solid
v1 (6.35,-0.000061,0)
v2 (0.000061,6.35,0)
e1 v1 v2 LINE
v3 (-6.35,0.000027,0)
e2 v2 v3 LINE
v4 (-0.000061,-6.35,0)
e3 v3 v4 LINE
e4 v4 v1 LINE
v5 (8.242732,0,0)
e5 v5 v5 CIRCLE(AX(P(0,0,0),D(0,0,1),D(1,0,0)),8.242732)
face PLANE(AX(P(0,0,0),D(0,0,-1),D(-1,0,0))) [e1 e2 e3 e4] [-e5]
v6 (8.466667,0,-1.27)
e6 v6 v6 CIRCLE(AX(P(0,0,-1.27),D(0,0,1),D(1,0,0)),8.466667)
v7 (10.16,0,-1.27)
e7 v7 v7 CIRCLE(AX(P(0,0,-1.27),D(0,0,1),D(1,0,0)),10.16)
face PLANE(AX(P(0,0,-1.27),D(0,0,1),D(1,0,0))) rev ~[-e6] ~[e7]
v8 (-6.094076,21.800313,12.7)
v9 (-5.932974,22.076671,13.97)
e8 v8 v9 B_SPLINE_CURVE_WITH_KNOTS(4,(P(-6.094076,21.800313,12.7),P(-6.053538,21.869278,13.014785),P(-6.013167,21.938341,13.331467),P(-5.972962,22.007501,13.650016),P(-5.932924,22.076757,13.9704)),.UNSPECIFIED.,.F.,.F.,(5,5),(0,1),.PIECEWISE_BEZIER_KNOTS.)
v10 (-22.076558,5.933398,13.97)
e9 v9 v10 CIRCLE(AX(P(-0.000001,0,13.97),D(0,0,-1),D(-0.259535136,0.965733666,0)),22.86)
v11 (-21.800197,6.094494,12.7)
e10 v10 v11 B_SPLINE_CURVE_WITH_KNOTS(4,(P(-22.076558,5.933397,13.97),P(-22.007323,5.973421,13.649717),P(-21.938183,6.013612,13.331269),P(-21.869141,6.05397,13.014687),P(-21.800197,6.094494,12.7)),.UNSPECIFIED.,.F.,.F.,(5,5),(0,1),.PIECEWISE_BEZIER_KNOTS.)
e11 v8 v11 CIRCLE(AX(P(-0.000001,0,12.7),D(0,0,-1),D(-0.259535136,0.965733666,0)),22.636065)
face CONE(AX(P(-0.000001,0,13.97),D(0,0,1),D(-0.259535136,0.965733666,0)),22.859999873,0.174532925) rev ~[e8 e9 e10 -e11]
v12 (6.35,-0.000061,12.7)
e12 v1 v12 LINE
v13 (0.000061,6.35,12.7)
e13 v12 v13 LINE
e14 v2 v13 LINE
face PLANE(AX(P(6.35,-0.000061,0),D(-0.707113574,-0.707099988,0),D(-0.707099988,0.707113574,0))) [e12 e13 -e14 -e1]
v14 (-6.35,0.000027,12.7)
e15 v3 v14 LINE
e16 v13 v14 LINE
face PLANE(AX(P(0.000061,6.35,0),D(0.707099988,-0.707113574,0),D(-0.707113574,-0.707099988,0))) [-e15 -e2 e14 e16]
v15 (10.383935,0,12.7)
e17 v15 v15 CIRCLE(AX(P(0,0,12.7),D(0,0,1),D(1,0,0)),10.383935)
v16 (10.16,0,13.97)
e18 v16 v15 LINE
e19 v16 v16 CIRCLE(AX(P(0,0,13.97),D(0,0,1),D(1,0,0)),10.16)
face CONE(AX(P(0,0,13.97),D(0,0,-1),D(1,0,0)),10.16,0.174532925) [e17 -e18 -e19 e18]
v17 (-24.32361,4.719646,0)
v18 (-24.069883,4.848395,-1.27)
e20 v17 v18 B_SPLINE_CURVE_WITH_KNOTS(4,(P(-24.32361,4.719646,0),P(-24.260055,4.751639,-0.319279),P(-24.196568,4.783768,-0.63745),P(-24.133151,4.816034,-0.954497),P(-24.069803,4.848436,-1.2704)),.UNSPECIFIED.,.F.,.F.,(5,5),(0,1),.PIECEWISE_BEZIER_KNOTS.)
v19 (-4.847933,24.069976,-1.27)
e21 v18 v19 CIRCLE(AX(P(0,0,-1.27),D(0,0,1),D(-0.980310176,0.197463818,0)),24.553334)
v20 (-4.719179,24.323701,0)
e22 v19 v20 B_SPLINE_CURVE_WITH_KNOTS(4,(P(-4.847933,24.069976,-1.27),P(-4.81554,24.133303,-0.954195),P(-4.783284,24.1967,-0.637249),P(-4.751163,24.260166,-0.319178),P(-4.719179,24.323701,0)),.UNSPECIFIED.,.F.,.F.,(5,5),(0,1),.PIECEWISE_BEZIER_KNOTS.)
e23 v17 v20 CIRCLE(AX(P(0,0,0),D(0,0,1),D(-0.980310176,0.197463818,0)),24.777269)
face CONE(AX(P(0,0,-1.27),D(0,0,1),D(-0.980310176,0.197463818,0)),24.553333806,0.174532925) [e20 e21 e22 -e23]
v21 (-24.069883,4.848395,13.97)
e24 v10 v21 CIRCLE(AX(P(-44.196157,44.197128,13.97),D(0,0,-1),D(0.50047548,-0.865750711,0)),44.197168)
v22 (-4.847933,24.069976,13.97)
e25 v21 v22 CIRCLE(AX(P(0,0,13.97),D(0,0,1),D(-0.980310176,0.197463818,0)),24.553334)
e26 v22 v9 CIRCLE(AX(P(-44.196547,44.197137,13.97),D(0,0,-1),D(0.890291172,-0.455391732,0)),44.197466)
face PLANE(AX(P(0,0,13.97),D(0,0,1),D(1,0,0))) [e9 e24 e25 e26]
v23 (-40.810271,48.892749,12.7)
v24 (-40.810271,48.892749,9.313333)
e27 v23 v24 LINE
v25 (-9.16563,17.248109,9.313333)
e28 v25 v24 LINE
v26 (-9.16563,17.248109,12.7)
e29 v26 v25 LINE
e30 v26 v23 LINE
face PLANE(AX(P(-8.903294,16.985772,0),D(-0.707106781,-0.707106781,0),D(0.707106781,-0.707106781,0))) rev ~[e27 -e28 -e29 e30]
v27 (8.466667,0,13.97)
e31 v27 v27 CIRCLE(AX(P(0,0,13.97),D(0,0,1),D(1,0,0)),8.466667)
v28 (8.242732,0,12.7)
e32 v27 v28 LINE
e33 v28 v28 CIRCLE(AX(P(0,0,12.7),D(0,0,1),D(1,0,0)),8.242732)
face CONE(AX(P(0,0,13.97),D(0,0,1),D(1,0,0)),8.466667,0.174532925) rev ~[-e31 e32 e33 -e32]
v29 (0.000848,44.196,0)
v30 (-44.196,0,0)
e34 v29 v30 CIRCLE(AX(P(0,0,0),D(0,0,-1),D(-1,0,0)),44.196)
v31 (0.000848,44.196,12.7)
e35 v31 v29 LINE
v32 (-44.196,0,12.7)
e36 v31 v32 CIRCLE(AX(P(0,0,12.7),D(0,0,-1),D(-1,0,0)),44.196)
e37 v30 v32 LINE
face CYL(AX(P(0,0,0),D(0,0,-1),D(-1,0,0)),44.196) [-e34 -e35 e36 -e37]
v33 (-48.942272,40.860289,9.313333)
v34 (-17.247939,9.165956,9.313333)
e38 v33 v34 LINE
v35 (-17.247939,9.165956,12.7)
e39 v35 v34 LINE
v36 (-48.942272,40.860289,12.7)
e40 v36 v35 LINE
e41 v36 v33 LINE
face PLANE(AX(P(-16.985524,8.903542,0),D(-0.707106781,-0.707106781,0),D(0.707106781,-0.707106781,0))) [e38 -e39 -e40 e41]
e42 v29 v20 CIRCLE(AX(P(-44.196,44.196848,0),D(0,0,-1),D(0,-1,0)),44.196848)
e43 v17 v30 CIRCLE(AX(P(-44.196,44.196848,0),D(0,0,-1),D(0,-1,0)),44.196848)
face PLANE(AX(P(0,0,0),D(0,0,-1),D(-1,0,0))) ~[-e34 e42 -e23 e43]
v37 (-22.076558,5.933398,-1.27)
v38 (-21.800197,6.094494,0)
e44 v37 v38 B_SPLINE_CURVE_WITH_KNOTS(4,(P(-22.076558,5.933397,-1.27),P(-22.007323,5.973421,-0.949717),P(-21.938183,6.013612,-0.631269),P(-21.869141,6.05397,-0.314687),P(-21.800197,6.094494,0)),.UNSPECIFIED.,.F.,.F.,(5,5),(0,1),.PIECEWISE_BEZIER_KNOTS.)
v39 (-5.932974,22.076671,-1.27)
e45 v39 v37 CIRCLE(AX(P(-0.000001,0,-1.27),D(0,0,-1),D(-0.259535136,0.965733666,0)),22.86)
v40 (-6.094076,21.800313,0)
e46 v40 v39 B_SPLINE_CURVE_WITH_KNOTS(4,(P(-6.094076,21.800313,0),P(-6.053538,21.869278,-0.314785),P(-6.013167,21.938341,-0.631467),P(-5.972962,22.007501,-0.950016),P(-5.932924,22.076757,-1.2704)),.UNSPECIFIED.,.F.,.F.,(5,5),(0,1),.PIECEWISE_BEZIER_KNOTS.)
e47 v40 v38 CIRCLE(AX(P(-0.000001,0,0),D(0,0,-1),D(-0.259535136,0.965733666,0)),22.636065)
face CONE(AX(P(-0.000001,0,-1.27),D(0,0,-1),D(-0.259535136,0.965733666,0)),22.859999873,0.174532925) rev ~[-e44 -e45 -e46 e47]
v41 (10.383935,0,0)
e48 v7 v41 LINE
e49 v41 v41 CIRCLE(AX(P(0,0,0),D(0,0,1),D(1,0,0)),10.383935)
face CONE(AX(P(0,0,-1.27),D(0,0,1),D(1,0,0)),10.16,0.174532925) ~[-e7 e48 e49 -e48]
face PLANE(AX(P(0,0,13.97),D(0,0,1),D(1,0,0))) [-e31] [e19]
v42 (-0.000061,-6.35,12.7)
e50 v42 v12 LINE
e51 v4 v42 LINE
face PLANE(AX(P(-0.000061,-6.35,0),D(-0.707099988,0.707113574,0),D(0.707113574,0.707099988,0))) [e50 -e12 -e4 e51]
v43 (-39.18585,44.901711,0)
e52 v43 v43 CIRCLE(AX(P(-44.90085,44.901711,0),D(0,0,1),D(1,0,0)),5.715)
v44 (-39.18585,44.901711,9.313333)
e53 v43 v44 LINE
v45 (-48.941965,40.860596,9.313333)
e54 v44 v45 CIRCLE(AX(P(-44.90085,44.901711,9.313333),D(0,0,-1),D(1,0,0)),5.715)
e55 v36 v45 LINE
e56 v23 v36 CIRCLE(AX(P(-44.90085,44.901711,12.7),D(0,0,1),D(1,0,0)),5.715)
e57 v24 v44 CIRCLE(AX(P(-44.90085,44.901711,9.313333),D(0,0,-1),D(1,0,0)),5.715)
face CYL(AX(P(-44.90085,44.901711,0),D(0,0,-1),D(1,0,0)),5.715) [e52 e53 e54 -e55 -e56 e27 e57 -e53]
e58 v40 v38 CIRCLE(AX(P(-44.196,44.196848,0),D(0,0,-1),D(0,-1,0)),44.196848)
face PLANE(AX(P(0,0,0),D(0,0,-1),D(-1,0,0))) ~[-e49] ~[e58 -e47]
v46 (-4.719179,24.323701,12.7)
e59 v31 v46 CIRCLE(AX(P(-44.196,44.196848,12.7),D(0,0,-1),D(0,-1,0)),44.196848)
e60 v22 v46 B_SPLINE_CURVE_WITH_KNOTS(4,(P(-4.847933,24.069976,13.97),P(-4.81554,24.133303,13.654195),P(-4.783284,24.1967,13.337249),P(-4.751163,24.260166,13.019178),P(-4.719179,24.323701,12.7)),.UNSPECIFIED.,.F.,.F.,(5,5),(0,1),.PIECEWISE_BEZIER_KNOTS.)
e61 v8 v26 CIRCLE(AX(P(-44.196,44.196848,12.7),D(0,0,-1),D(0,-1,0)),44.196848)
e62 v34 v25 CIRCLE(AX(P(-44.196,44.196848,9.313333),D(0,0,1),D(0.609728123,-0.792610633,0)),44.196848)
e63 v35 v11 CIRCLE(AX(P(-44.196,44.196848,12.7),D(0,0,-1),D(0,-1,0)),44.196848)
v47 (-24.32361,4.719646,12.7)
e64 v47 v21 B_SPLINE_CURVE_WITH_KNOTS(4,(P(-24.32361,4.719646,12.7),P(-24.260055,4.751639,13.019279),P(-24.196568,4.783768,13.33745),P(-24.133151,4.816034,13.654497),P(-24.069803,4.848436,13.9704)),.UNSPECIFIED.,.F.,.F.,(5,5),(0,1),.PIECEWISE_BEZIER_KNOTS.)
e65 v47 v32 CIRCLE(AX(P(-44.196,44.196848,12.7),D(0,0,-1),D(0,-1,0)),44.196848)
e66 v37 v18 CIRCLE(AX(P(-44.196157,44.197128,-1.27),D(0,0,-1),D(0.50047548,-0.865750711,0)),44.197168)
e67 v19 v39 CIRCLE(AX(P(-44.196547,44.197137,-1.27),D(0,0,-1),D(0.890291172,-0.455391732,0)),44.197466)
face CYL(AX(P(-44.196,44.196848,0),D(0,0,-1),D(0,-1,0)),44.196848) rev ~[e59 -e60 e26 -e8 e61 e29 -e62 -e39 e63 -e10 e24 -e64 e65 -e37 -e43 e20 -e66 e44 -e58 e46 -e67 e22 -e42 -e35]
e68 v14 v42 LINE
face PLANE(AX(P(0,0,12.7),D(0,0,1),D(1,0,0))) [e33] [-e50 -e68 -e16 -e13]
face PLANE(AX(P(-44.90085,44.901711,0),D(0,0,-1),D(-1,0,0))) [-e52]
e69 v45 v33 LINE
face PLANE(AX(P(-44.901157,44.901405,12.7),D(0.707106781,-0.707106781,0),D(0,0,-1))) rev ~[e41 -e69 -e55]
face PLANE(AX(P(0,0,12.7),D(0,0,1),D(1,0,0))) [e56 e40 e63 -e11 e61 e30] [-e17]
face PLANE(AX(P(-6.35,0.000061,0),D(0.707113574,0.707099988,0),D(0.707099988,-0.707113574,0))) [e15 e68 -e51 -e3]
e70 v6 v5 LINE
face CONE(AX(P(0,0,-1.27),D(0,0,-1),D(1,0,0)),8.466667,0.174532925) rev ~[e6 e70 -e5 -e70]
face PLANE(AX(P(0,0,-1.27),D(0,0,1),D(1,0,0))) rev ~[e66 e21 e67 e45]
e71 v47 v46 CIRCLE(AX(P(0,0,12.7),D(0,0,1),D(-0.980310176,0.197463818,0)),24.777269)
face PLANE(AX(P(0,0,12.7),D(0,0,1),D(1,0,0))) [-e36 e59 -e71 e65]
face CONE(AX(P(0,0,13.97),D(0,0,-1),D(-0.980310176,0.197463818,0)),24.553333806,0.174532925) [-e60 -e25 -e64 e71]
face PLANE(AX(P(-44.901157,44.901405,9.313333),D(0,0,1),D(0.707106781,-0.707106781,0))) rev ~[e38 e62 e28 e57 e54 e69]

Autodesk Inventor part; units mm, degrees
ref_plane "YZ Plane" through (0, 0, 0) normal (1, 0, 0) x (0, 1, 0)
ref_plane "XZ Plane" through (0, 0, 0) normal (0, 1, 0) x (-1, 0, 0)
ref_plane "XY Plane" through (0, 0, 0) normal (0, 0, 1) x (1, 0, 0)
sketch "Sketch1" plane through (0, 0, 0) normal (0, 0, 1) x (1, 0, 0)
  line L0 (0, 0) -> (-89.8017, 0) construction
  line L1 (-89.8017, 0) -> (-44.90085, 44.901711) construction
  line L2 (-44.90085, 44.901711) -> (0, 0) construction
  arc A0 (-44.196, 0) -> (0.000848, 44.196) centre (0, 0) ccw
  line L3 (-44.196, 0) -> (-44.196, 44.196848) construction
  line L4 (-44.196, 44.196848) -> (-44.90085, 44.901711) construction
  circle A1 centre (-44.90085, 44.901711) radius 5.715
  arc A2 (-44.196, 0) -> (0.000848, 44.196) centre (-44.196, 44.196848) ccw
  dimension "d8" = 89.8017
  dimension "d9" = 63.5
  dimension "d10" = 63.5
  dimension "d11" = 44.196
  dimension "d12" = 11.43
extrude "Extrusion1" add sketch "Sketch1" along normal blind 13.97 and the other way blind 1.27
sketch "Sketch5" plane through (0, 0, 13.97) normal (0, 0, 1) x (1, 0, 0)
  line L0 (2.846729, 10.62373) -> (7.777055, -7.777205)
  line L1 (7.777055, -7.777205) -> (-10.623784, -2.846525)
  line L2 (-10.623784, -2.846525) -> (2.846729, 10.62373)
  line L3 (0, 0) -> (-12.944409, 12.944657) construction
  arc A0 (-44.196, 0) -> (0.000848, 44.196) centre (-44.196, 44.196848) ccw
  dimension "d31" = 19.05
extrude "Extrusion4" cut sketch "Sketch5" against normal through all
sketch "Sketch6" plane through (0, 0, -1.27) normal (0, 0, -1) x (-1, 0, 0)
  circle A0 centre (0, 0) radius 6.35
  dimension "d34" = 12.7
extrude "Extrusion5" add sketch "Sketch6" along normal blind 8.466667 and the other way blind 21.166667
sketch "Sketch7" plane through (0, 0, 13.97) normal (0, 0, 1) x (1, 0, 0)
  circle A0 centre (0, 0) radius 12.7
  dimension "d39" = 25.4
extrude "Extrusion6" add sketch "Sketch7" against normal up to surface (15.24 mm away)
sketch "Sketch8" plane through (0, 0, -9.736667) normal (0, 0, -1) x (-1, 0, 0)
  circle A0 centre (0, 0) radius 6.35
  line L0 (4.490085, 4.490171) -> (1.64356, -6.133613)
  line L1 (1.64356, -6.133613) -> (-6.133645, 1.643442)
  line L2 (-6.133645, 1.643442) -> (4.490085, 4.490171)
  circle A1 centre (44.90085, 44.901711) radius 5.715
  line L3 (44.90085, 44.901711) -> (0, 0)
extrude "Extrusion7" add sketch "Sketch8" along normal blind 12.7 contours L0 L1 L2
ref_plane "Work Plane1" through (-44.90085, 44.901711, 7.196667) normal (0, 0, -1) x (-1, 0, 0)
sketch "Sketch9" plane through (0, 0, 19.896667) normal (0, 0, 1) x (1, 0, 0)
  circle A0 centre (0, 0) radius 6.35 projected
extrude "Extrusion8" add sketch "Sketch9" along normal blind 1.27
sketch "Sketch10" plane through (0, 0, 13.97) normal (0, 0, 1) x (1, 0, 0)
  circle A0 centre (0, 0) radius 6.35 projected
extrude "Extrusion9" add sketch "Sketch10" along normal blind 8.466667
sketch "Sketch11" plane through (0, 0, 13.97) normal (0, 0, 1) x (1, 0, 0)
  circle A0 centre (0, 0) radius 8.466667
  circle A1 centre (0, 0) radius 10.16
  arc A2 (-44.196, 0) -> (0.000848, 44.196) centre (-44.196, 44.196848) ccw
  arc A3 (-22.076558, 5.933398) -> (-5.932974, 22.076671) centre (0, 0) ccw
  arc A4 (-24.069883, 4.848395) -> (-4.847933, 24.069976) centre (0, 0) ccw
  arc A5 (-44.196, 0) -> (0.000848, 44.196) centre (0, 0) ccw
  circle A6 centre (0, 0) radius 50.8
  point P0 (-37.249283, 0.549345)
  point P1 (-0.548631, 37.249293)
  point P2 (-38.945409, 0.312994)
  point P3 (-0.312247, 38.945415)
  dimension "d51" = 16.93333
  dimension "d52" = 1.69333
  dimension "d53" = 1.69333
  dimension "d55" = 12.7
  dimension "d61" = 101.6
sketch "Sketch11 outline for Extrusion10" plane through (0, 0, 13.97) normal (0, 0, 1) x (1, 0, 0)
  circle A0 centre (0, 0) radius 50.8
  circle A1 centre (0, 0) radius 10.16
  arc A2 (-5.932974, 22.076671) -> (-22.076558, 5.933398) centre (0, 0) cw
  arc A3 (-22.076558, 5.933398) -> (-24.069883, 4.848395) centre (-44.196, 44.196848) cw
  arc A4 (-24.069883, 4.848395) -> (-4.847933, 24.069976) centre (0, 0) ccw
  arc A5 (-4.847933, 24.069976) -> (-5.932974, 22.076671) centre (-44.196, 44.196848) cw
  circle A6 centre (0, 0) radius 8.466667
extrude "Extrusion10" cut sketch "Sketch11 outline for Extrusion10" against normal blind 1.27 draft -10
sketch "Sketch12" plane through (0, 0, 22.436667) normal (0, 0, 1) x (1, 0, 0)
  circle A0 centre (0, 0) radius 6.35 projected
extrude "Extrusion11" add sketch "Sketch12" against normal up to surface (9.736667 mm away)
ref_plane "Work Plane2" through (0, 0, 6.35) normal (0, 0, 1) x (1, 0, 0)
mirror "Mirror1" about plane through (0, 0, 6.35) normal (0, 0, 1) of "Extrusion10"
sketch "Sketch14" plane through (-44.90085, 44.901711, -1.27) normal (0, 0, -1) x (-1, 0, 0)
  circle A0 centre (0, 0) radius 5.715 projected
  point P0 (-44.90085, -44.901711)
extrude "Extrusion12" cut sketch "Sketch14" against normal blind 1.27
sketch "Sketch15" plane through (-44.90085, 44.901711, 13.97) normal (0, 0, 1) x (1, 0, 0)
  circle A0 centre (0, 0) radius 5.715 projected
  point P0 (44.90085, -44.901711)
extrude "Extrusion13" cut sketch "Sketch15" against normal blind 1.27
ref_plane "Work Plane3" through (-12.944409, 12.944657, 0) normal (-0.7071136, -0.7071, 0) x (0.7071, -0.7071136, 0)
sketch "Sketch17" plane through (-12.944409, 12.944657, 0) normal (-0.7071136, -0.7071, 0) x (0.7071, -0.7071136, 0)
  line L0 (-50.908666, 12.7) -> (-39.478666, 12.7)
  line L1 (-39.478666, 12.7) -> (0, 12.7)
  line L2 (0, 12.7) -> (0, 9.313333)
  line L3 (0, 9.313333) -> (-39.478666, 9.313333)
  line L4 (-39.478666, 9.313333) -> (-39.478666, 12.7)
  line L5 (0, 12.7) -> (0, 0)
  line L6 (-39.478666, 12.7) -> (-45.193666, 12.7)
  line L7 (-45.193666, 12.7) -> (-45.193666, 9.313333)
  line L8 (-45.193666, 9.313333) -> (-39.478666, 9.313333)
  line L9 (-39.478666, 9.313333) -> (-39.478666, 12.7)
  line L10 (-39.478666, 0) -> (-50.908666, 0)
  point P0 (18.306334, 0)
  point P1 (-45.193666, 0)
  dimension "d69" = 3.38667
extrude "Extrusion14" add sketch "Sketch17" along normal mid plane 11.43
sketch "Sketch18" plane through (0, 0, -22.436667) normal (0, 0, -1) x (-1, 0, 0)
  circle A0 centre (0, 0) radius 6.35
  dimension "d72" = 12.7
extrude "Extrusion15" cut sketch "Sketch18" against normal through all
sketch "Sketch19" plane through (0, 0, 0) normal (0, 0, -1) x (-1, 0, 0)
  circle A0 centre (0, 0) radius 6.35
  line L0 (6.35, 0.000061) -> (0.000061, -6.35)
  line L1 (0.000061, -6.35) -> (-6.35, -0.000061)
  line L2 (-6.35, -0.000061) -> (-0.000061, 6.35)
  line L3 (-0.000061, 6.35) -> (6.35, 0.000061)
  circle A1 centre (44.90085, 44.901711) radius 5.715 construction
  line L4 (44.90085, 44.901711) -> (0, 0) construction
extrude "Extrusion16" add sketch "Sketch19" against normal up to surface (12.7 mm away) contours L3 A0 | A0 L0 | L2 A0 | A0 L1
properties part number "Geneva Drive" material "ABS Plastic"
